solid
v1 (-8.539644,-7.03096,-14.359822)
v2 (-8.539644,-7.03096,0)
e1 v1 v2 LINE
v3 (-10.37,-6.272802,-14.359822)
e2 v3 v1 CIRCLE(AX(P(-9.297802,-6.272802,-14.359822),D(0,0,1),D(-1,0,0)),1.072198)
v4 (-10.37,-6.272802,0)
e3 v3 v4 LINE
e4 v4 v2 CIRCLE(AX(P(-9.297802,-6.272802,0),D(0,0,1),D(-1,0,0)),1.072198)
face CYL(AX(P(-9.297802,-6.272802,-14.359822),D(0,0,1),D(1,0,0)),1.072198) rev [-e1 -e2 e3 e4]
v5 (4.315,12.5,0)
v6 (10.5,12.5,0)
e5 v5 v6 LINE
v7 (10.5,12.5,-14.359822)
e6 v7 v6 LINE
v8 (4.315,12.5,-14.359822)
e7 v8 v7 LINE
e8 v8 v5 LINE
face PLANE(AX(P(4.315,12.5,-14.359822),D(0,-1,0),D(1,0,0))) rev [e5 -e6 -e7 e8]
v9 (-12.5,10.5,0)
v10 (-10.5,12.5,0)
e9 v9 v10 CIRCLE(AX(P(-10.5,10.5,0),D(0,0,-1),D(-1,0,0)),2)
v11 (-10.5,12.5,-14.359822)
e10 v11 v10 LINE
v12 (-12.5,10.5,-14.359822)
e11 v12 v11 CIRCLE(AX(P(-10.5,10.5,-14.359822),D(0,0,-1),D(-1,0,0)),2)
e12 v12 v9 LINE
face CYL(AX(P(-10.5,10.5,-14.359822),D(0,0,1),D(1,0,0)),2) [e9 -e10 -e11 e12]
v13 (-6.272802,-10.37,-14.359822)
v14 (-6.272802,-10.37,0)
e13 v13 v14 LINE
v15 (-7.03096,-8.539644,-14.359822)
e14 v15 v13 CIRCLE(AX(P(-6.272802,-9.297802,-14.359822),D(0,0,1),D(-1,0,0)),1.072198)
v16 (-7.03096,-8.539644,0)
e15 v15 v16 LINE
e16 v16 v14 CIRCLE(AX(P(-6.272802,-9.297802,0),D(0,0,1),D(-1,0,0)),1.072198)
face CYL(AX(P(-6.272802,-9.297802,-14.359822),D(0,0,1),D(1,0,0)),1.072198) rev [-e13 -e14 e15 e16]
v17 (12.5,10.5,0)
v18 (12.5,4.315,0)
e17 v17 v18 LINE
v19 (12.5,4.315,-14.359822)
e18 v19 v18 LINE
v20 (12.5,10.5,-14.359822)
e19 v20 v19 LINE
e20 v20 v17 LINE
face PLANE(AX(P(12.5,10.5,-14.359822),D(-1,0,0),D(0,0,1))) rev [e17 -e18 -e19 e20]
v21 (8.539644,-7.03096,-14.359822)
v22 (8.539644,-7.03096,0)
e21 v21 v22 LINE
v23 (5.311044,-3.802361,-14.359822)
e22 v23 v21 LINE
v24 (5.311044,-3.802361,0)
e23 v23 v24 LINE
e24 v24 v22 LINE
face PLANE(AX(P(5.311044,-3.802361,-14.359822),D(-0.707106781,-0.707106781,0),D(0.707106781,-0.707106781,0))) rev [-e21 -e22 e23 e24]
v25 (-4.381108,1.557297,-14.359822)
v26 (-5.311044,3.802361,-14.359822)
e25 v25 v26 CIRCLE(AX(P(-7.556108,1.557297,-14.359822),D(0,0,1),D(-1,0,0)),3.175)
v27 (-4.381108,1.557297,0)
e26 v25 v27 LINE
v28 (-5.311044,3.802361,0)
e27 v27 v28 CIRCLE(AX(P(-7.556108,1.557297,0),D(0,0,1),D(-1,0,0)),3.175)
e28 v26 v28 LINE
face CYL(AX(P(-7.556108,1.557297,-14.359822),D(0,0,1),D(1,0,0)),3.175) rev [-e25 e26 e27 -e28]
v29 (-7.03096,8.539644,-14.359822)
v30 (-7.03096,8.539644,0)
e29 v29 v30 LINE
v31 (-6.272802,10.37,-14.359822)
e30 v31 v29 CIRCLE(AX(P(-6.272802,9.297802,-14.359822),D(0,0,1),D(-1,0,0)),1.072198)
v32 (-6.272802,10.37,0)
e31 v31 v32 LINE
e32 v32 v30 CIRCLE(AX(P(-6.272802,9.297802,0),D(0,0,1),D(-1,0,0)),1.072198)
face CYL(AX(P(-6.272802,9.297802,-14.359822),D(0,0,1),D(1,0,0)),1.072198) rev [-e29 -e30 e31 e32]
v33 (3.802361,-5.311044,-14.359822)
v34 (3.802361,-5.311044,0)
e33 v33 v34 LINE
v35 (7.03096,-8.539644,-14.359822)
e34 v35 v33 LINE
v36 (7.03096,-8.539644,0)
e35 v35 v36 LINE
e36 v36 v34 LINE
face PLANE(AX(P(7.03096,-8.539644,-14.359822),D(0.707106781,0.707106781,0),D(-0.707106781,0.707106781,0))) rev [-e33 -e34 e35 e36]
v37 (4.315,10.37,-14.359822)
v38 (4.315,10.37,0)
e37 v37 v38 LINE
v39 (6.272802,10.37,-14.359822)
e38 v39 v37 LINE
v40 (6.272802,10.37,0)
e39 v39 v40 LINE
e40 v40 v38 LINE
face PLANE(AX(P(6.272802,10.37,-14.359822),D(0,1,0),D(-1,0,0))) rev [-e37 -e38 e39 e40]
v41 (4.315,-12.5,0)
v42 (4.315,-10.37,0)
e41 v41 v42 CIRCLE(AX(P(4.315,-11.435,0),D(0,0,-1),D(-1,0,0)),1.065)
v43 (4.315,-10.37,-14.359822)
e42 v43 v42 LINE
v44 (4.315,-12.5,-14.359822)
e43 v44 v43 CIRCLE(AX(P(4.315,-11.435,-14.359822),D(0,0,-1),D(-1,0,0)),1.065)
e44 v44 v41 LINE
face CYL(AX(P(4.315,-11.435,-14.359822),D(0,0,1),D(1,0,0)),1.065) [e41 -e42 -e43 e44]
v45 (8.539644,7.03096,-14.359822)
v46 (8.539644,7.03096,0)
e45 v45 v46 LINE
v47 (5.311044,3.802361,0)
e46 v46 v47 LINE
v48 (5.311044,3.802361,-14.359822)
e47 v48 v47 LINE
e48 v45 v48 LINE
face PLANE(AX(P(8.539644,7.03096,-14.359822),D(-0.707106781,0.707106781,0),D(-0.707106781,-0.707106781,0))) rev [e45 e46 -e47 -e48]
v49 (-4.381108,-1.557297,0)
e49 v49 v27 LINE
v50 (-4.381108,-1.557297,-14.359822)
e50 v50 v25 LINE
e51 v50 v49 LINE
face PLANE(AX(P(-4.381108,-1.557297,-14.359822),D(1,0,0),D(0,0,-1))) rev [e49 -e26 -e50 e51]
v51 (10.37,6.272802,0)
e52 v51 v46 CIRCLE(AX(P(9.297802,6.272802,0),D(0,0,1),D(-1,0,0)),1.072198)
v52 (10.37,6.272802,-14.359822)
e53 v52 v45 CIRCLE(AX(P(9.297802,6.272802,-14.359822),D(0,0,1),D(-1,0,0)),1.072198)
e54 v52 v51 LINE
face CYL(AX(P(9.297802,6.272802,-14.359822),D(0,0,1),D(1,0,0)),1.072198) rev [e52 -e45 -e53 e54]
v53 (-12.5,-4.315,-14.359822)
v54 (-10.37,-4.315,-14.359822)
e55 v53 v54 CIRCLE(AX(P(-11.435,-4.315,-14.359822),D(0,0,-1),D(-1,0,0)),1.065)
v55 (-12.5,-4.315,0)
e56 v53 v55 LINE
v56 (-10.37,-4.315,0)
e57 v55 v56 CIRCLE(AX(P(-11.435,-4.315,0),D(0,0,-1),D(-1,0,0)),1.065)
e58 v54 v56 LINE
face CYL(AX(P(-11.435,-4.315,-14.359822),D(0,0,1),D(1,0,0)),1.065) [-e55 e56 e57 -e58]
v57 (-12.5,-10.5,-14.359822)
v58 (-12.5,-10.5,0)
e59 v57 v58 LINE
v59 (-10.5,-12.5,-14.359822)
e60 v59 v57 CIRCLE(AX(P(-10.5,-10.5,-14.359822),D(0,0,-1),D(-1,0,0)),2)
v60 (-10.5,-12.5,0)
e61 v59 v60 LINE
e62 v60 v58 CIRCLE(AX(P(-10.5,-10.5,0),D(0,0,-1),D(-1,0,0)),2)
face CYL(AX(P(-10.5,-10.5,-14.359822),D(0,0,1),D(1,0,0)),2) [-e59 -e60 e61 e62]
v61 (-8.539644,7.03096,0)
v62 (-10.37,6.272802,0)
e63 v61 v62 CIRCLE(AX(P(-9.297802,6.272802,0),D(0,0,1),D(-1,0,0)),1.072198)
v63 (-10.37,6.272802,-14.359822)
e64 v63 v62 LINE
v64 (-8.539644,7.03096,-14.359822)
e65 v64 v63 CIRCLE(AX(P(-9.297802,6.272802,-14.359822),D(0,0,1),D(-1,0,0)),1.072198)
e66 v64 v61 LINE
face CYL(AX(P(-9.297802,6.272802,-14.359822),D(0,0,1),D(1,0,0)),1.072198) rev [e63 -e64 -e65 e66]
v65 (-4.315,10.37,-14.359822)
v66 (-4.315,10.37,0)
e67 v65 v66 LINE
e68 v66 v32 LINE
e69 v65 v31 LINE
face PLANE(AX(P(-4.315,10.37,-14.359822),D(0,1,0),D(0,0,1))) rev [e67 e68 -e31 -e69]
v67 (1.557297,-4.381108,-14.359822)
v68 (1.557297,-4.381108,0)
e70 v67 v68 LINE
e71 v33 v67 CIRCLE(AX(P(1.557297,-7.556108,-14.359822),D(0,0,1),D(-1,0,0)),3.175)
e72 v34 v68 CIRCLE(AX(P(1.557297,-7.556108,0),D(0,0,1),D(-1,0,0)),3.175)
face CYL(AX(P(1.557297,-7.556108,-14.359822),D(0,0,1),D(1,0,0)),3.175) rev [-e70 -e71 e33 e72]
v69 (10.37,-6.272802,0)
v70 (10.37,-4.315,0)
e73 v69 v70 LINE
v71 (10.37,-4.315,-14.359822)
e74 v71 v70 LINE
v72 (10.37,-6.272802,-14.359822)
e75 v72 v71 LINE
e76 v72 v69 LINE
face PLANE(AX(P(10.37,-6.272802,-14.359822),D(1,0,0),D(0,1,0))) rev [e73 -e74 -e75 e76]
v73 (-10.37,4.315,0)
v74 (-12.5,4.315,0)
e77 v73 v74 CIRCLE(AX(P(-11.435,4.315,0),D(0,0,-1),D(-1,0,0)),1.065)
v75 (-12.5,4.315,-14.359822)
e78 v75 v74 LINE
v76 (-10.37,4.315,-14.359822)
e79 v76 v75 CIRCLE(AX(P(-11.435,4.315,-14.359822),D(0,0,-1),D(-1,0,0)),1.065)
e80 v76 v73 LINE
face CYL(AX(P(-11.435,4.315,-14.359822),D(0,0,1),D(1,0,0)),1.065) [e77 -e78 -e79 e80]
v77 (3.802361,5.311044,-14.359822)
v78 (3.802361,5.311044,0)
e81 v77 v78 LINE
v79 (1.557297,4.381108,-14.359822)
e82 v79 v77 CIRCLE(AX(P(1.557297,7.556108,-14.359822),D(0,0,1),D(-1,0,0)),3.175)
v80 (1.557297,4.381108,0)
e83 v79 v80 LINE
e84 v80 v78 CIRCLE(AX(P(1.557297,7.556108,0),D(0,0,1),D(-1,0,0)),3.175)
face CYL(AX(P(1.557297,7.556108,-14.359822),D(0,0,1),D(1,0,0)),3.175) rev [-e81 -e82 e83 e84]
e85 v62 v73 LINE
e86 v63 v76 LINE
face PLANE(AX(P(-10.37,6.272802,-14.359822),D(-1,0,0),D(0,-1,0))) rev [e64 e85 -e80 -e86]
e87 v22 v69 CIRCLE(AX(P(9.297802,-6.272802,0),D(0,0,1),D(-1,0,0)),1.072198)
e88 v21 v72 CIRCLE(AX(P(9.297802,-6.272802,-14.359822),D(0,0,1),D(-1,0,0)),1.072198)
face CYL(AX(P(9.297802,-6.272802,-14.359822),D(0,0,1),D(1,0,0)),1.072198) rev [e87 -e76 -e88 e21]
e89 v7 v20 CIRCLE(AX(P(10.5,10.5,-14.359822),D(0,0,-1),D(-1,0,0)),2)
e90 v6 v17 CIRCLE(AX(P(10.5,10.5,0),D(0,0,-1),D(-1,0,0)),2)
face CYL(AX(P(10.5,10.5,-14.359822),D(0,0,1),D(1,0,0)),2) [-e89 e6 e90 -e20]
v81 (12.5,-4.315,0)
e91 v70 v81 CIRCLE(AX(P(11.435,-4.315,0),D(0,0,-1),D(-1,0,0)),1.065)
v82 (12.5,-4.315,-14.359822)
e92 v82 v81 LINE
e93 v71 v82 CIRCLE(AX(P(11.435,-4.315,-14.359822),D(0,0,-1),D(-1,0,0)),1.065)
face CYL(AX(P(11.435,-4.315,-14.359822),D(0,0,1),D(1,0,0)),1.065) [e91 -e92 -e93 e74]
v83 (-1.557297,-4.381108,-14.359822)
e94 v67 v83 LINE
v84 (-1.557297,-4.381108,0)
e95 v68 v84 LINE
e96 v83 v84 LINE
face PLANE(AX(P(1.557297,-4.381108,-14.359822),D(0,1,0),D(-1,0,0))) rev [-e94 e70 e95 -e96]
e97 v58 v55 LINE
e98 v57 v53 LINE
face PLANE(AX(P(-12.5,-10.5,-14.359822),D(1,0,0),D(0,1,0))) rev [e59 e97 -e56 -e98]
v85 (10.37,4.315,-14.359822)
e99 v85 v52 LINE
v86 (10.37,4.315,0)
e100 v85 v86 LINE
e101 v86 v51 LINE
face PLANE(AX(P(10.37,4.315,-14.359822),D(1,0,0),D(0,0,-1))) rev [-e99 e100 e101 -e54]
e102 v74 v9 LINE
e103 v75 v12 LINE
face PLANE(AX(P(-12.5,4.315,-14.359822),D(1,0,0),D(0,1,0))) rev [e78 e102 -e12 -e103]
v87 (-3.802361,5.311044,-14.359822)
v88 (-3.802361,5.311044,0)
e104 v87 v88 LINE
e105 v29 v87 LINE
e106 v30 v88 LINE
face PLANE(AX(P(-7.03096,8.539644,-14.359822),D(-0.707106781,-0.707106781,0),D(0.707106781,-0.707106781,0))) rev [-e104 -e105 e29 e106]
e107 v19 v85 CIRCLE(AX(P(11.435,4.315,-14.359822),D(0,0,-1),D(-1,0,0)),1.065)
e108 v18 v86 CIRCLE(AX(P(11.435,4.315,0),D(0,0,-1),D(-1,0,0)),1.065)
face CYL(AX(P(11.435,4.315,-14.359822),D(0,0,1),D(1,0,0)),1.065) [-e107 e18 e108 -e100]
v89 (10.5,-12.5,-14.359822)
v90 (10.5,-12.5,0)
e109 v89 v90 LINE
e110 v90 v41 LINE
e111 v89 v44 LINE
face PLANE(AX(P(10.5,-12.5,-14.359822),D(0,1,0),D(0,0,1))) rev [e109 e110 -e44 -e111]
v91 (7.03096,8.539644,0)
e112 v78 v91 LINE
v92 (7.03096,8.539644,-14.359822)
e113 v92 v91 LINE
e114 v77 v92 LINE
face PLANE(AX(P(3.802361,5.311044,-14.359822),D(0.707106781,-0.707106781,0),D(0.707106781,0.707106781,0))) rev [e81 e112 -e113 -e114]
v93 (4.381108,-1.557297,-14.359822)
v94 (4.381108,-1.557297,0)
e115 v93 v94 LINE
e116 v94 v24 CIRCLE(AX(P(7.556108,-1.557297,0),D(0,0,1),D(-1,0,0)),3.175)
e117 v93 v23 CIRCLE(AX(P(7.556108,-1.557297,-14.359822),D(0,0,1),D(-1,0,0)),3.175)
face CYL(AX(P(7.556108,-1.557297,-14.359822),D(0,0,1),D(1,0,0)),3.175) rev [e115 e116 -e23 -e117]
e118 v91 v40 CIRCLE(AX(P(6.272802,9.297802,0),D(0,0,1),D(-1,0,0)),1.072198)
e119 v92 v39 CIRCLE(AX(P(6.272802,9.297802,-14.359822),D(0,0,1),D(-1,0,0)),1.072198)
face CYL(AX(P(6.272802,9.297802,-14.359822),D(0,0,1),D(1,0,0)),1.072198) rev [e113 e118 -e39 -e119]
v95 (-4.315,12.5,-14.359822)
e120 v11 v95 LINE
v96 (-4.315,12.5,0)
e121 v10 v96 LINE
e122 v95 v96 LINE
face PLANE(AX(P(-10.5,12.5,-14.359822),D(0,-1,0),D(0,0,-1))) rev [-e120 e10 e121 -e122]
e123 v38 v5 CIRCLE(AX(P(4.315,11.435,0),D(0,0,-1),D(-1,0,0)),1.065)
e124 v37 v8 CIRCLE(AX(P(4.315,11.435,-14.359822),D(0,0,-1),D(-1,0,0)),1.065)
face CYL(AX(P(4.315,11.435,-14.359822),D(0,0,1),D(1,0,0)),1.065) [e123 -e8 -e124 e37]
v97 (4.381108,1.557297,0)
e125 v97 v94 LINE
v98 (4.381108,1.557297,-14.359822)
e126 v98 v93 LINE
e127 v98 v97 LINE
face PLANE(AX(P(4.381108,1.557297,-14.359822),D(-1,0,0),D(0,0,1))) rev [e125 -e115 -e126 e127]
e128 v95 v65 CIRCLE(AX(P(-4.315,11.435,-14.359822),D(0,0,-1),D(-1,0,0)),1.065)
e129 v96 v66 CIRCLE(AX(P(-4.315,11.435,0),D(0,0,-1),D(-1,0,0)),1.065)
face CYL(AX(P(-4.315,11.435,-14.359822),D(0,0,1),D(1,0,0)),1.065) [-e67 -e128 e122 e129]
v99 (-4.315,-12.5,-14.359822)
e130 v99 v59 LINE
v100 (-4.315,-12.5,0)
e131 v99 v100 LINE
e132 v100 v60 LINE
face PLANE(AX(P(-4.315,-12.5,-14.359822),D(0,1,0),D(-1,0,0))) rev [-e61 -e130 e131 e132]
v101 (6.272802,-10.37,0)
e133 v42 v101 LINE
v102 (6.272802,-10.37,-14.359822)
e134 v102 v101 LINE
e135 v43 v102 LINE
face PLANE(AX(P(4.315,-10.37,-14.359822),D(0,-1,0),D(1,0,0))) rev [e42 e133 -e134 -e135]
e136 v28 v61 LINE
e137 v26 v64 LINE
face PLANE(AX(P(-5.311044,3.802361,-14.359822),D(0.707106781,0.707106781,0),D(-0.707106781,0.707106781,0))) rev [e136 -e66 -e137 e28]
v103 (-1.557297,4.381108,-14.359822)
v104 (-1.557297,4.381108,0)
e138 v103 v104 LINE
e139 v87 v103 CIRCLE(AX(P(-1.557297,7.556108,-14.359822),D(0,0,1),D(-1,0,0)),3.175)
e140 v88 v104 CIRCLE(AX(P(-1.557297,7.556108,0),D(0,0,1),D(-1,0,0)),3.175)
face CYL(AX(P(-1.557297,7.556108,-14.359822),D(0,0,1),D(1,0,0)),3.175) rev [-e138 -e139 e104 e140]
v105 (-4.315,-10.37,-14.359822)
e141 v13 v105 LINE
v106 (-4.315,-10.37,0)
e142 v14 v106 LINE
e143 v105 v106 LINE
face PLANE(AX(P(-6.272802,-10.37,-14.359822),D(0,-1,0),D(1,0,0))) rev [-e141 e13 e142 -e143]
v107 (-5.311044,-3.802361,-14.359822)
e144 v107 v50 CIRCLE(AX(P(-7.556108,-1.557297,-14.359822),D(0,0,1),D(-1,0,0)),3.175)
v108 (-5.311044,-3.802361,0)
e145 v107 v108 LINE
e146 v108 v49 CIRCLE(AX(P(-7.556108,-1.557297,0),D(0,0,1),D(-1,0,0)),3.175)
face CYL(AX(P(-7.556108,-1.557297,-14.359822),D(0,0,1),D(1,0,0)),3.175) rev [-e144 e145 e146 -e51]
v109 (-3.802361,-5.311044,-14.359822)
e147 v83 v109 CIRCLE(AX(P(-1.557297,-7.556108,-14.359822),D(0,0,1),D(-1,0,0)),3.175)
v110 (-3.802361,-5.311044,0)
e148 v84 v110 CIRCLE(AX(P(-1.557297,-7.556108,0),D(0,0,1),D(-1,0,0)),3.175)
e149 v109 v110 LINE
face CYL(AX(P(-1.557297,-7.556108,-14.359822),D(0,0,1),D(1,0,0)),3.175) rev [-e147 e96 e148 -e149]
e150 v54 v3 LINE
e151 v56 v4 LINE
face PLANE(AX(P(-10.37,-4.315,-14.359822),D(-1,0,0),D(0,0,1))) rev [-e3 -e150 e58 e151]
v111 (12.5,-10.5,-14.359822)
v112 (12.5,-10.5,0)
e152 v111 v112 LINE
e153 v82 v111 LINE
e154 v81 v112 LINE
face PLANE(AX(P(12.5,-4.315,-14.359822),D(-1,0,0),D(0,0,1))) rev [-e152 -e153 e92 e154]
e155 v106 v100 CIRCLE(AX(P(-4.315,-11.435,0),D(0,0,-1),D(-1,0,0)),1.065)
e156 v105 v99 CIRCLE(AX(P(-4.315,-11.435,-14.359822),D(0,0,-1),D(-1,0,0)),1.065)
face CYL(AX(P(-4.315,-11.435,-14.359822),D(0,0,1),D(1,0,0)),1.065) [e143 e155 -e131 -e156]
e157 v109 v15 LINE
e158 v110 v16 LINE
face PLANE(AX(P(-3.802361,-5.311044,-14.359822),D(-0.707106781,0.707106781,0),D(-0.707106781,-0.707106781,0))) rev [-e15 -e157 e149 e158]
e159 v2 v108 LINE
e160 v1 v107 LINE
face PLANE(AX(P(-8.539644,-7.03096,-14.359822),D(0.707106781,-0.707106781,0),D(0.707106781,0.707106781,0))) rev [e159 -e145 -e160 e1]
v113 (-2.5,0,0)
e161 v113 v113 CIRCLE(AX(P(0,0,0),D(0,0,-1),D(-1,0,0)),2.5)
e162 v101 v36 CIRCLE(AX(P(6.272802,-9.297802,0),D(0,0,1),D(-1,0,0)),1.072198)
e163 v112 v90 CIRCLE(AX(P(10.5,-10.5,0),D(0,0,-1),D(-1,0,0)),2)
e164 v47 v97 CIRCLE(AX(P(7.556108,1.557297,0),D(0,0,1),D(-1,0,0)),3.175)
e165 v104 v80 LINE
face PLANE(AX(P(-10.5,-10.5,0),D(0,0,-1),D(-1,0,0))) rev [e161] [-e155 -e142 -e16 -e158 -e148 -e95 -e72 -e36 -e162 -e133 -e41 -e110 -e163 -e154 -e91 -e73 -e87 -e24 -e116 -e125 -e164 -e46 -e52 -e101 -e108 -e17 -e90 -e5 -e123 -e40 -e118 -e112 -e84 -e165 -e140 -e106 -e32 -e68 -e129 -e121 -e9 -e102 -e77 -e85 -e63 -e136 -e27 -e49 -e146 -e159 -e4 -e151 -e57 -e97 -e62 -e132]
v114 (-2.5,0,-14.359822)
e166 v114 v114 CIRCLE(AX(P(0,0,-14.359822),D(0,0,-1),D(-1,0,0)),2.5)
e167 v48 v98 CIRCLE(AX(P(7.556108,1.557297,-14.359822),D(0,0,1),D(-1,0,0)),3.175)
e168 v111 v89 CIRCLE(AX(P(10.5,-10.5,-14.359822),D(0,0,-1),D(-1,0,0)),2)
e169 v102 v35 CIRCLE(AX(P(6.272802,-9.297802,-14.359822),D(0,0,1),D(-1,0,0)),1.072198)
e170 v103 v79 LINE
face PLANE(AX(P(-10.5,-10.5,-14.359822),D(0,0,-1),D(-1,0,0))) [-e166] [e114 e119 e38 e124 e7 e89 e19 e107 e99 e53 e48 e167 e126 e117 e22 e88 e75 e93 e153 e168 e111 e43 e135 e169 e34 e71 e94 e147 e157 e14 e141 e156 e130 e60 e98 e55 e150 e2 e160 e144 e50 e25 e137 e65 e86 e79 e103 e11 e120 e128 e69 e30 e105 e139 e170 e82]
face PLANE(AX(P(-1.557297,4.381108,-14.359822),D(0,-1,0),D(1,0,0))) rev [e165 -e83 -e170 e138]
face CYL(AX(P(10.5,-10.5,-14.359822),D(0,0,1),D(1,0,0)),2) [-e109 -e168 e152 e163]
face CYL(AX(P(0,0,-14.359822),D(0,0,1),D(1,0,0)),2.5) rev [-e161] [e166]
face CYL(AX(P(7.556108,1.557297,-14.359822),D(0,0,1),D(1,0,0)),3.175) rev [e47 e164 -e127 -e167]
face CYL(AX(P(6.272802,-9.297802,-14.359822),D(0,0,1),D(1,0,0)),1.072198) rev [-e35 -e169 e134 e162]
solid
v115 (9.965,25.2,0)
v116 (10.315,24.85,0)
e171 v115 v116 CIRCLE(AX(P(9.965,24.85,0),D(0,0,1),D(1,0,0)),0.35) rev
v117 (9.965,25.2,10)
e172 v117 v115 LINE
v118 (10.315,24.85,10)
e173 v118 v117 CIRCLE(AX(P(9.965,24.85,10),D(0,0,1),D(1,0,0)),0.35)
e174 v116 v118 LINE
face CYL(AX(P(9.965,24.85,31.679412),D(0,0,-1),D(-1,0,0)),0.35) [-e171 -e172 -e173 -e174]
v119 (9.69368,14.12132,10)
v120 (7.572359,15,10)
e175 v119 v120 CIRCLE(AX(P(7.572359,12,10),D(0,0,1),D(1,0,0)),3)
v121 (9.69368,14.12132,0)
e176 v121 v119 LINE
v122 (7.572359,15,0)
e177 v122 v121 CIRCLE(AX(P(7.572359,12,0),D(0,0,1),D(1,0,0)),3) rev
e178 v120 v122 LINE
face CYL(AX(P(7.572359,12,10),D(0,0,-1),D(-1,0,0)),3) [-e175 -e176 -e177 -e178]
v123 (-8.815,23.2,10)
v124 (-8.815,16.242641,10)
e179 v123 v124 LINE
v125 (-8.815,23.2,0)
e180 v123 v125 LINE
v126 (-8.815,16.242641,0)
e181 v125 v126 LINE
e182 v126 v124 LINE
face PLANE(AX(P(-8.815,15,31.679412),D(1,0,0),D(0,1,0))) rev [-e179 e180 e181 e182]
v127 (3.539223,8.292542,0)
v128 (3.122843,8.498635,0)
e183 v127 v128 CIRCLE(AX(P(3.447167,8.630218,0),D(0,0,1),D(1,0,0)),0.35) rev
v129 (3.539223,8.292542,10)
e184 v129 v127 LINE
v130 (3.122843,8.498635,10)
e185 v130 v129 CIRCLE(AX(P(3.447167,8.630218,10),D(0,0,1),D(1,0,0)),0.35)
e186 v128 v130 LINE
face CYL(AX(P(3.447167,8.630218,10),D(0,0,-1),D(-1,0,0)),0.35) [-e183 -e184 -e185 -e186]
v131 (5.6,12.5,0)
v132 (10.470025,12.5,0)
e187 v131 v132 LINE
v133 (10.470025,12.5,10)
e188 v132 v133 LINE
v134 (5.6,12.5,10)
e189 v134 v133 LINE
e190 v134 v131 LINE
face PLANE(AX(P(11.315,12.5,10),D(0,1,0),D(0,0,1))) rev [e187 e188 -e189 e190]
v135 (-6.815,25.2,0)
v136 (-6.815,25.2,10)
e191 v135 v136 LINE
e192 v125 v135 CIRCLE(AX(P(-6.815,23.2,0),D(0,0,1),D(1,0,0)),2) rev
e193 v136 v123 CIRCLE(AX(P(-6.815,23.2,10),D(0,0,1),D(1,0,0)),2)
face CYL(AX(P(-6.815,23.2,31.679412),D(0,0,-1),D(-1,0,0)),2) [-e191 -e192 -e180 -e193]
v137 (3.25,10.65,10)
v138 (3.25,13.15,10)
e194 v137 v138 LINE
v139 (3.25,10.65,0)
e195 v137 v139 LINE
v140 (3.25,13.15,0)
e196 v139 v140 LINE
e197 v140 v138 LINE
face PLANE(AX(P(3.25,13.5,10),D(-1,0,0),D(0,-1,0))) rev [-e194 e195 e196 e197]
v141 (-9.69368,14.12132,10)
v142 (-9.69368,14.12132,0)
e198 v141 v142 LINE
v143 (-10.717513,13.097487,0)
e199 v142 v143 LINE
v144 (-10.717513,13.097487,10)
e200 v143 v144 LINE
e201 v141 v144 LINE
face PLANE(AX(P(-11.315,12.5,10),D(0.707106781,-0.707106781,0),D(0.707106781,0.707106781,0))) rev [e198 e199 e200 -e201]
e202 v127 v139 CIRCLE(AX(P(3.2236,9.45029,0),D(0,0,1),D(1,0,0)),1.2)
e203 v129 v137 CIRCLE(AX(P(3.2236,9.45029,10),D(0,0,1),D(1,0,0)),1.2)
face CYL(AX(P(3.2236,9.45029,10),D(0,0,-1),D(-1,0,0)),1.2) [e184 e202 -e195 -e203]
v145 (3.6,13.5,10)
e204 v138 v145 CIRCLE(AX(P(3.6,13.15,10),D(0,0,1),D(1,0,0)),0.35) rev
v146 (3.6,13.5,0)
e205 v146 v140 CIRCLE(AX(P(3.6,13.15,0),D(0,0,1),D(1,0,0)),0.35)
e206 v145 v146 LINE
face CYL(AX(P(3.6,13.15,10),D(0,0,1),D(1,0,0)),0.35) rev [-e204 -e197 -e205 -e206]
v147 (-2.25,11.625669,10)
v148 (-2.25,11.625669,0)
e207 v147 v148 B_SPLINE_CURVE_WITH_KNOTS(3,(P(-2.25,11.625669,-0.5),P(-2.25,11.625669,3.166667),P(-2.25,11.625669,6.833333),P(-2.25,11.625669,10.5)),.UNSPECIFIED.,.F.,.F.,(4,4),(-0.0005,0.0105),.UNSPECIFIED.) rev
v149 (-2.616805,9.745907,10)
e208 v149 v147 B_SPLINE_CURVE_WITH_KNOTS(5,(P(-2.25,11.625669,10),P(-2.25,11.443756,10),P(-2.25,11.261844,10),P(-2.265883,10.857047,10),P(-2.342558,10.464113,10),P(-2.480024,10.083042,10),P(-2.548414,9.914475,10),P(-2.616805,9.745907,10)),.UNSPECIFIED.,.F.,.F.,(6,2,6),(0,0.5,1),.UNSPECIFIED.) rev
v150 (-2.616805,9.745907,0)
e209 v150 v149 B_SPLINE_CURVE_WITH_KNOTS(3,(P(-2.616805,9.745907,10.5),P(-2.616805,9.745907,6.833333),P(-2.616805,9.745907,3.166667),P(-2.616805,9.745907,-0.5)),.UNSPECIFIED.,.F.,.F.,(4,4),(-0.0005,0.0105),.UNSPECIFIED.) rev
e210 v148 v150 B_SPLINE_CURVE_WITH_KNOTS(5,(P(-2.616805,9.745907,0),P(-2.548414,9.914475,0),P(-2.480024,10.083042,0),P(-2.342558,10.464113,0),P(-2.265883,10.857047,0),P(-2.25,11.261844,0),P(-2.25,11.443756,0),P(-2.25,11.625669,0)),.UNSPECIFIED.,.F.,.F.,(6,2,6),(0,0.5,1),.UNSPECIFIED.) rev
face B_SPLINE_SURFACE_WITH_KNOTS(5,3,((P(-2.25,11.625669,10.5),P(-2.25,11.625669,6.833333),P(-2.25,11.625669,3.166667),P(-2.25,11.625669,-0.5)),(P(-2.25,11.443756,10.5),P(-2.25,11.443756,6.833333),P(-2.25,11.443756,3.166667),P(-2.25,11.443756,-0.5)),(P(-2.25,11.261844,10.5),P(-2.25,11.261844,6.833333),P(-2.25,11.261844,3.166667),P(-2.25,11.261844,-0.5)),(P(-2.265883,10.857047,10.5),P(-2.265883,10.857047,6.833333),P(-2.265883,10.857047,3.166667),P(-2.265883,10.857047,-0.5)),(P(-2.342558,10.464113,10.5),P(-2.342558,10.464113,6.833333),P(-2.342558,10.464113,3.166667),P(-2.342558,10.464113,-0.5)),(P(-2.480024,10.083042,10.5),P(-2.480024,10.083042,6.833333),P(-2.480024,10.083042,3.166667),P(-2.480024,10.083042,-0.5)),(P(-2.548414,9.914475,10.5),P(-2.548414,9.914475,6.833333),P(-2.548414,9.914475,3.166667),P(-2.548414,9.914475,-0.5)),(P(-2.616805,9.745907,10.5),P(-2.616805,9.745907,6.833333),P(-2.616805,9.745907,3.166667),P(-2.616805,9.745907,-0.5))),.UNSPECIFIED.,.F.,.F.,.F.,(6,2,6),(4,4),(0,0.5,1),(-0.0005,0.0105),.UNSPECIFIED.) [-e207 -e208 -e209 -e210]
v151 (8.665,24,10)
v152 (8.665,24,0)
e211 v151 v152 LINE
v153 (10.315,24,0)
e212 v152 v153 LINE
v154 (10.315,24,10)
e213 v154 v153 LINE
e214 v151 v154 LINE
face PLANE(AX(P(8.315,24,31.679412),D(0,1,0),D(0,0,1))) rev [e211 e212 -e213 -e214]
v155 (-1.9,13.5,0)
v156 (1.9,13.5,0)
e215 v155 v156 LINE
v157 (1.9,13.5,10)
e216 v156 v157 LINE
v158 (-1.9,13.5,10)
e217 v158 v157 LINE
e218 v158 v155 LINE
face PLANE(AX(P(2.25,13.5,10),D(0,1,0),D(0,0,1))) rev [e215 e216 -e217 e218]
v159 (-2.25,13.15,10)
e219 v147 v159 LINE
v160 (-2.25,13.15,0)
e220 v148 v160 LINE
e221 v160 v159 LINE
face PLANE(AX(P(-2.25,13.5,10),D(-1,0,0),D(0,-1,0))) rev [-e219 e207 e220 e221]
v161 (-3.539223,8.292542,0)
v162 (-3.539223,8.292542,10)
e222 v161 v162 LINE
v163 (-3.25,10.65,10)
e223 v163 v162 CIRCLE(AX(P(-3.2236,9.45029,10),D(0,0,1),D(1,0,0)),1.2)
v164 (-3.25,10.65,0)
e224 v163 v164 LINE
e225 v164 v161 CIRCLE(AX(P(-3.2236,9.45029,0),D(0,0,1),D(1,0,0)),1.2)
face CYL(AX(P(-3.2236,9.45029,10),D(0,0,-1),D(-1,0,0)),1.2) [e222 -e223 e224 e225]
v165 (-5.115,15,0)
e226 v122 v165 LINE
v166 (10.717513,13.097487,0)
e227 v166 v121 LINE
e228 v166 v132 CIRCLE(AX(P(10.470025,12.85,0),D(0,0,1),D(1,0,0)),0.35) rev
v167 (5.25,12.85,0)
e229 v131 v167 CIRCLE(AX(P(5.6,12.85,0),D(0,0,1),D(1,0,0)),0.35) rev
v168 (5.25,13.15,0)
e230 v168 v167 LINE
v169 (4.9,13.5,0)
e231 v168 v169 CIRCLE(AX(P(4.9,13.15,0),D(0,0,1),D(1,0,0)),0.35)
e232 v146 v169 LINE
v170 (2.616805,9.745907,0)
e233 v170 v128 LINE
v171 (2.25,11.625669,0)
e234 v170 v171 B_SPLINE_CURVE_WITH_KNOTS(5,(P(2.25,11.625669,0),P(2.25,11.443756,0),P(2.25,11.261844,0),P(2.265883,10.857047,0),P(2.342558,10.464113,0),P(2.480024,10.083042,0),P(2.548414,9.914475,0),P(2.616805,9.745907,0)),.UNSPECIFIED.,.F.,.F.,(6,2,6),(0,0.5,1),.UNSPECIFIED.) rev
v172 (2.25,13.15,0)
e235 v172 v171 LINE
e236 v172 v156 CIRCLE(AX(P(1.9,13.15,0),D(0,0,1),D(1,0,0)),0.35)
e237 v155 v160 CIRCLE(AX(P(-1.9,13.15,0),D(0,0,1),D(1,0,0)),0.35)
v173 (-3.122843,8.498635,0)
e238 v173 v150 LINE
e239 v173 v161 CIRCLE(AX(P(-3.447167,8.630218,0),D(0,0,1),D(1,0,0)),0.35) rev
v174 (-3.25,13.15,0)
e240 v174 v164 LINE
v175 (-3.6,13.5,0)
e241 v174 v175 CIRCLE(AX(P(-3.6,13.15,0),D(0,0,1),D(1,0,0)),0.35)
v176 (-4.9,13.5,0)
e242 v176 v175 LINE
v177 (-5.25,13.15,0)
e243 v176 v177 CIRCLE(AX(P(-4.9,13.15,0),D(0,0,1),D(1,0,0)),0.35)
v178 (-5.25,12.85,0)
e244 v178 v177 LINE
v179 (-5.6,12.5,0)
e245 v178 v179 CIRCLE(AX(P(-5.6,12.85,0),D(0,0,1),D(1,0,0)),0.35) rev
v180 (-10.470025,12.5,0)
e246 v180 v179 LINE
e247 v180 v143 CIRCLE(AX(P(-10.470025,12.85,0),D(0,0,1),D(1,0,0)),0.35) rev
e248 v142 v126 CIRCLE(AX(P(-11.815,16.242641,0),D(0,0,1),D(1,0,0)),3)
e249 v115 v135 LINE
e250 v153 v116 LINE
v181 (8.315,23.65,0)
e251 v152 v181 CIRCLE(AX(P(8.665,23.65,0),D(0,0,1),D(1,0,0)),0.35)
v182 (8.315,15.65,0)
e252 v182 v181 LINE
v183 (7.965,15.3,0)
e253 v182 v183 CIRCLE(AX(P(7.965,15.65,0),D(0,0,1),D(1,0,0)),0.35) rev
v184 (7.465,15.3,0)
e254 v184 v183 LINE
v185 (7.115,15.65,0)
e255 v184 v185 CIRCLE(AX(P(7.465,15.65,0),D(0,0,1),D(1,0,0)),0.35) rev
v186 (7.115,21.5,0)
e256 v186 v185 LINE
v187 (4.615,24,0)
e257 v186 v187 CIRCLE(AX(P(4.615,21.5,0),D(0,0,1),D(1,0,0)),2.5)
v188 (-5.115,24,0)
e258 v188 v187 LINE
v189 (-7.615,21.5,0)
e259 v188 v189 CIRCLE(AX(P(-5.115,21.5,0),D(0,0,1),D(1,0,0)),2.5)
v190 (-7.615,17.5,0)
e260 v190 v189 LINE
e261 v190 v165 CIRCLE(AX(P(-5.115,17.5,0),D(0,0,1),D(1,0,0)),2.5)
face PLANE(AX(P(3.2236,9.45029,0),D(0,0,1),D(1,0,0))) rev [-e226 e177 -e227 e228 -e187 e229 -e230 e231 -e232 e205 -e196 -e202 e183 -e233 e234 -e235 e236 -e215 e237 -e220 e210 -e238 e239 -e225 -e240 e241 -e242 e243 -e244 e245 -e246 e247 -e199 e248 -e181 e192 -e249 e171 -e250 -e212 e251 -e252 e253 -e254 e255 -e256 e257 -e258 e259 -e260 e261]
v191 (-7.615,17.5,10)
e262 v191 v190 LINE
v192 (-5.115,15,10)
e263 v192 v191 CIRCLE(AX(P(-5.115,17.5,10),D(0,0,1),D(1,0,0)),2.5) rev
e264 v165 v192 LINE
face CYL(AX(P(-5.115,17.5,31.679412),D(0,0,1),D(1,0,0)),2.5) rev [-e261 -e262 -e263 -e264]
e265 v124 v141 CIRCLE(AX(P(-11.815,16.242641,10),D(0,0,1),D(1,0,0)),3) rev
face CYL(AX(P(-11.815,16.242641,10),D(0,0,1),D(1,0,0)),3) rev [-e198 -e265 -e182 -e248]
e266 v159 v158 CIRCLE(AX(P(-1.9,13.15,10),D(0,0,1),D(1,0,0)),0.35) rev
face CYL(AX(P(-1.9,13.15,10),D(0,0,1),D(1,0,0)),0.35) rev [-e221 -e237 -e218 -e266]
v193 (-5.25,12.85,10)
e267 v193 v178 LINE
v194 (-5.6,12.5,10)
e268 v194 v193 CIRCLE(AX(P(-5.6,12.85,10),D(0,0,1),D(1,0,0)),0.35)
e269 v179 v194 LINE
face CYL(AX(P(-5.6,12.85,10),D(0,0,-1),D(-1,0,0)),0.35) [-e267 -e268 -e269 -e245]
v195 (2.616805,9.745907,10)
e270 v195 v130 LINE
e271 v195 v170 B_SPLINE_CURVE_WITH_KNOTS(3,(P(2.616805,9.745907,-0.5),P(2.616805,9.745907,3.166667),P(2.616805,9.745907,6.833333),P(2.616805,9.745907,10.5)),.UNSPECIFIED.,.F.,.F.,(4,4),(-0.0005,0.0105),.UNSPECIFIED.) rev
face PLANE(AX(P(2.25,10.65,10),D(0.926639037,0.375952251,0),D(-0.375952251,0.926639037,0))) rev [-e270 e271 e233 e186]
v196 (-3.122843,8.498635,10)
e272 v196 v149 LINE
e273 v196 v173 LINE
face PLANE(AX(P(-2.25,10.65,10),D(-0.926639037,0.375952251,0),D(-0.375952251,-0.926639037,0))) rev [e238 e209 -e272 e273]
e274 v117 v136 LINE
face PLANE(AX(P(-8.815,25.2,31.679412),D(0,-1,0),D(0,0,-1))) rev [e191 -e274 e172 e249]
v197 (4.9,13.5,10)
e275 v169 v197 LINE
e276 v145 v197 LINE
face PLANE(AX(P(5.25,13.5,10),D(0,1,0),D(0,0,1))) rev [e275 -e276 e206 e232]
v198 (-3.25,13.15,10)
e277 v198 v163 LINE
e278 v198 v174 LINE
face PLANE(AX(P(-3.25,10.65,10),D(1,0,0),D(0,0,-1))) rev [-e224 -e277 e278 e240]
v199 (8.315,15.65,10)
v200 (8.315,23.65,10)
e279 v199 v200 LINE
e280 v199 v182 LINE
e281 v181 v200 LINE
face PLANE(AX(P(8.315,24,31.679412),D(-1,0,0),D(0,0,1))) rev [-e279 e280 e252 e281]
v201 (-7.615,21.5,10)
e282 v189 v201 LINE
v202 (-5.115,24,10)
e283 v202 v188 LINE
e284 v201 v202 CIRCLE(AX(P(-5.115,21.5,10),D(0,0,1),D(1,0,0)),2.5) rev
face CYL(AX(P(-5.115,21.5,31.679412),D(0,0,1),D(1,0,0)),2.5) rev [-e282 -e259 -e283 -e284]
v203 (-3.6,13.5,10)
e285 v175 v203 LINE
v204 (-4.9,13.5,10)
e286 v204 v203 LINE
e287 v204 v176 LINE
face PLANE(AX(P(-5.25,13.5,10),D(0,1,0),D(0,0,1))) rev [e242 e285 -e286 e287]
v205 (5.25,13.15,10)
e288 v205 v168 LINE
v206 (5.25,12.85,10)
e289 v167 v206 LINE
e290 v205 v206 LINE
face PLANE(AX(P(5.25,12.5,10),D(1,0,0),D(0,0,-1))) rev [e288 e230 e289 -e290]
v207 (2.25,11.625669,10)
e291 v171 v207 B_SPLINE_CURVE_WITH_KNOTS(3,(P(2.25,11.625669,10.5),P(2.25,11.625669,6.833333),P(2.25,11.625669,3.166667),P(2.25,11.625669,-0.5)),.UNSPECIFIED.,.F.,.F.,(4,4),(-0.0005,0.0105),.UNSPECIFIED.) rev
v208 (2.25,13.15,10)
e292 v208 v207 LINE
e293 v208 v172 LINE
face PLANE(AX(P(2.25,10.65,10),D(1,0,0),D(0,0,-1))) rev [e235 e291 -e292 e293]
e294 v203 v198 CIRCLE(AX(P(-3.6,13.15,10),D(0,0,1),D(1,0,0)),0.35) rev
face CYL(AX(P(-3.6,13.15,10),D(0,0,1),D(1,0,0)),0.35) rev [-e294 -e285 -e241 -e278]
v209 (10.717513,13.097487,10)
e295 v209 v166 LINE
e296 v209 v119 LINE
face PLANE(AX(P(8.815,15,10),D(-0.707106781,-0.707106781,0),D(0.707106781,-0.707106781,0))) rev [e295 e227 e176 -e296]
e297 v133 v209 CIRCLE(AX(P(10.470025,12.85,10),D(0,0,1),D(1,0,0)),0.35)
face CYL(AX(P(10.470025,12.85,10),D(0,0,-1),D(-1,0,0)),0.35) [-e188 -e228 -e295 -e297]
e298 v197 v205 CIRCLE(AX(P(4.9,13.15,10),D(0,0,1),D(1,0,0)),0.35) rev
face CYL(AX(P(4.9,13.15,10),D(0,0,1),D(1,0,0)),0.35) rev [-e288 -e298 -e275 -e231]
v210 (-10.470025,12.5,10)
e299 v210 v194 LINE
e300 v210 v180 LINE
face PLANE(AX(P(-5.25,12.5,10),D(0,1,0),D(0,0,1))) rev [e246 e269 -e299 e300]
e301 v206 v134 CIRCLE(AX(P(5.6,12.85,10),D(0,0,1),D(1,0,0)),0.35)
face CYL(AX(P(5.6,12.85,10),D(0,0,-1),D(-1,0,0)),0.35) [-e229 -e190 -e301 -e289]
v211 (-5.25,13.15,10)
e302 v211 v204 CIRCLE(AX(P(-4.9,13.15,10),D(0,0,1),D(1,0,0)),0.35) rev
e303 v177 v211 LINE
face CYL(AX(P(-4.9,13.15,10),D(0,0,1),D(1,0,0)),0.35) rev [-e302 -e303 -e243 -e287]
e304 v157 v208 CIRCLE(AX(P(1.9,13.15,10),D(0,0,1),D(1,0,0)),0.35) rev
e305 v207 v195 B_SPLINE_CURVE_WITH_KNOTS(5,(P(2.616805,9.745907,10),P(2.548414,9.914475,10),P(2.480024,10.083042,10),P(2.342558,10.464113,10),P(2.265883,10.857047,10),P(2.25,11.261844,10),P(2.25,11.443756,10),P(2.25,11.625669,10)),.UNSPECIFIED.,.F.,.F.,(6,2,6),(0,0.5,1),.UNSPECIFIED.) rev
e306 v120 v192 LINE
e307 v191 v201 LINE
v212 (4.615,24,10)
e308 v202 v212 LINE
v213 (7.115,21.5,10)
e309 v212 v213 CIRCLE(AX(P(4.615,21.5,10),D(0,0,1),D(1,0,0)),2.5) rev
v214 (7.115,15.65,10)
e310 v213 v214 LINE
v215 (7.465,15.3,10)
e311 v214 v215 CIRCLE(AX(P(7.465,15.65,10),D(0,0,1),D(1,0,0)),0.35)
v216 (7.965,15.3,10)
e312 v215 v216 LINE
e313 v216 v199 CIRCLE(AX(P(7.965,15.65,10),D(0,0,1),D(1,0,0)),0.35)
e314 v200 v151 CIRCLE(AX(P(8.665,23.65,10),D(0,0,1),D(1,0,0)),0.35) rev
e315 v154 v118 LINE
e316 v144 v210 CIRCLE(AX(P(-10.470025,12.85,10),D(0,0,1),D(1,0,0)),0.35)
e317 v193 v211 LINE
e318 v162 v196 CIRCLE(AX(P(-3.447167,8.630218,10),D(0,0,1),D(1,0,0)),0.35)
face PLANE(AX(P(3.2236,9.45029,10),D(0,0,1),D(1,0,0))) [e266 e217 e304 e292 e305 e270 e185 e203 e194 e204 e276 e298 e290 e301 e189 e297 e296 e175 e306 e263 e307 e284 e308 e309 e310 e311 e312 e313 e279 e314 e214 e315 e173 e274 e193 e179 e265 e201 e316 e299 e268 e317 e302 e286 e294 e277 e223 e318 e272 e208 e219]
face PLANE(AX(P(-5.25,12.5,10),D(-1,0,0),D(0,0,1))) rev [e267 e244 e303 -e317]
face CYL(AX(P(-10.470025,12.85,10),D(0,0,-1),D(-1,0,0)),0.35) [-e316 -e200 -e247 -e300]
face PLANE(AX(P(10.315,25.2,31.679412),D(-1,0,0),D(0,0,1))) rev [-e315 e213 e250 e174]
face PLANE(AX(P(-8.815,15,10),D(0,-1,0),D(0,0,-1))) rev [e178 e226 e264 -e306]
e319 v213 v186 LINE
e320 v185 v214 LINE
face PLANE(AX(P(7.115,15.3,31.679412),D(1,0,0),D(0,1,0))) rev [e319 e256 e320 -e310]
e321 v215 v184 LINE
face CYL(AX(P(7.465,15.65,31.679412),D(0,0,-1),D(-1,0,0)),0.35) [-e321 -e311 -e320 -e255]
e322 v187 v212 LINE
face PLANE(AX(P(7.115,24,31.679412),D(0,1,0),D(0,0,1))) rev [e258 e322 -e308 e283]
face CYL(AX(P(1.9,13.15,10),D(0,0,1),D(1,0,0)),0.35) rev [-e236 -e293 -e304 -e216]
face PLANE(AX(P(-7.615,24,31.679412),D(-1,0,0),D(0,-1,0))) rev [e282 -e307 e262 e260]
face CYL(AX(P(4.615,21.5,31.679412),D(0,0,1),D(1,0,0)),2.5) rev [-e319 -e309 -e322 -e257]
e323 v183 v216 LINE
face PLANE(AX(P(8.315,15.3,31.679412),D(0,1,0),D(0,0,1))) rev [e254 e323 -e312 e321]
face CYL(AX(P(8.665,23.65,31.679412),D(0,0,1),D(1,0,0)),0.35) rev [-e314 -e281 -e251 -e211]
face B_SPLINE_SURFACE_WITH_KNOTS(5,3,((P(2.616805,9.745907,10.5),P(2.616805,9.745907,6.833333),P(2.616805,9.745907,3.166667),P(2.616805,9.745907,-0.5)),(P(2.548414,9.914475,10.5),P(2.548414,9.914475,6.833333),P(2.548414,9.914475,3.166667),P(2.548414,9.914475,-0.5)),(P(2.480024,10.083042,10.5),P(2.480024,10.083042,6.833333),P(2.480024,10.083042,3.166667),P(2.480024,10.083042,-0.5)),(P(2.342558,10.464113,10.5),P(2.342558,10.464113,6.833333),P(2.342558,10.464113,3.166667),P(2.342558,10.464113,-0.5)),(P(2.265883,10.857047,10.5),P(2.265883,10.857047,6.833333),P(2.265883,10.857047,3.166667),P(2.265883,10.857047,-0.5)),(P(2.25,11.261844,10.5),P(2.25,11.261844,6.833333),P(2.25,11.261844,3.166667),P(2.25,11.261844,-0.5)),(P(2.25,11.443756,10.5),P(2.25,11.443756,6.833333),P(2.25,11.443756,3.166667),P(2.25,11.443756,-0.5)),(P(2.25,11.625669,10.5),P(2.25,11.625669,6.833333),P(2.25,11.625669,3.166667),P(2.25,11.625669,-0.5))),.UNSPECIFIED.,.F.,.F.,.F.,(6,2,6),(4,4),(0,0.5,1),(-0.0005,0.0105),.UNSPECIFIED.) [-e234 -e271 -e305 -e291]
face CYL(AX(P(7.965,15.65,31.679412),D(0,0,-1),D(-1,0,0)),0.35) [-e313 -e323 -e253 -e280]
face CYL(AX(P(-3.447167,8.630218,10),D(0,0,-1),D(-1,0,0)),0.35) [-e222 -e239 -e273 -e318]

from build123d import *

# Parameters (mm, degrees)
SKETCH11_R                             = 2.5
F_25_SERIES_EXTRUSIONS_25_2525_1_DEPTH = 14.359821885
BOSS_EXTRUDE1_DEPTH                    = 10
BOSS_EXTRUDE3_DEPTH                    = 10
FILLET_R0_35_R                         = 0.35
FILLET2_R                              = 2.5
FILLET_R3_0_R                          = 3
FILLET4_R                              = 2


with BuildPart() as part:
    # Sketch11 → 25 series extrusions 25-2525(1) (new body)
    with BuildSketch(Plane(origin=(0, 0, 0), x_dir=(-1, 0, 0), z_dir=(0, 0, -1))):
        with BuildLine():
            Line((12.5, -10.5), (12.5, -4.315))
            ThreePointArc((12.5, -4.315), (11.435, -3.25), (10.37, -4.315))
            Line((10.37, -4.315), (10.37, -6.272801987))
            ThreePointArc((10.37, -6.272801987), (9.708114403, -7.263383786), (8.539643501, -7.030960473))
            Line((8.539643501, -7.030960473), (5.311043881, -3.802360852))
            ThreePointArc((5.311043881, -3.802360852), (4.622790395, -2.77231672), (4.381107911, -1.557296822))
            Line((4.381107911, -1.557296822), (4.381107911, 1.557296822))
            ThreePointArc((4.381107911, 1.557296822), (4.622790395, 2.77231672), (5.311043881, 3.802360852))
            Line((5.311043881, 3.802360852), (8.539643501, 7.030960473))
            ThreePointArc((8.539643501, 7.030960473), (9.708114403, 7.263383786), (10.37, 6.272801987))
            Line((10.37, 6.272801987), (10.37, 4.315))
            ThreePointArc((10.37, 4.315), (11.435, 3.25), (12.5, 4.315))
            Line((12.5, 4.315), (12.5, 10.5))
            ThreePointArc((12.5, 10.5), (11.914213562, 11.914213562), (10.5, 12.5))
            Line((10.5, 12.5), (4.315, 12.5))
            ThreePointArc((4.315, 12.5), (3.25, 11.435), (4.315, 10.37))
            Line((4.315, 10.37), (6.272801987, 10.37))
            ThreePointArc((6.272801987, 10.37), (7.263383786, 9.708114403), (7.030960473, 8.539643501))
            Line((7.030960473, 8.539643501), (3.802360852, 5.311043881))
            ThreePointArc((3.802360852, 5.311043881), (2.77231672, 4.622790395), (1.557296822, 4.381107911))
            Line((1.557296822, 4.381107911), (-1.557296822, 4.381107911))
            ThreePointArc((-1.557296822, 4.381107911), (-2.77231672, 4.622790395), (-3.802360852, 5.311043881))
            Line((-3.802360852, 5.311043881), (-7.030960473, 8.539643501))
            ThreePointArc((-7.030960473, 8.539643501), (-7.263383786, 9.708114403), (-6.272801987, 10.37))
            Line((-6.272801987, 10.37), (-4.315, 10.37))
            ThreePointArc((-4.315, 10.37), (-3.25, 11.435), (-4.315, 12.5))
            Line((-4.315, 12.5), (-10.5, 12.5))
            ThreePointArc((-10.5, 12.5), (-11.914213562, 11.914213562), (-12.5, 10.5))
            Line((-12.5, 10.5), (-12.5, 4.315))
            ThreePointArc((-12.5, 4.315), (-11.435, 3.25), (-10.37, 4.315))
            Line((-10.37, 4.315), (-10.37, 6.272801987))
            ThreePointArc((-10.37, 6.272801987), (-9.708114403, 7.263383786), (-8.539643501, 7.030960473))
            Line((-8.539643501, 7.030960473), (-5.311043881, 3.802360852))
            ThreePointArc((-5.311043881, 3.802360852), (-4.622790395, 2.77231672), (-4.381107911, 1.557296822))
            Line((-4.381107911, 1.557296822), (-4.381107911, -1.557296822))
            ThreePointArc((-4.381107911, -1.557296822), (-4.622790395, -2.77231672), (-5.311043881, -3.802360852))
            Line((-5.311043881, -3.802360852), (-8.539643501, -7.030960473))
            ThreePointArc((-8.539643501, -7.030960473), (-9.708114403, -7.263383786), (-10.37, -6.272801987))
            Line((-10.37, -6.272801987), (-10.37, -4.315))
            ThreePointArc((-10.37, -4.315), (-11.435, -3.25), (-12.5, -4.315))
            Line((-12.5, -4.315), (-12.5, -10.5))
            ThreePointArc((-12.5, -10.5), (-11.914213562, -11.914213562), (-10.5, -12.5))
            Line((-10.5, -12.5), (-4.315, -12.5))
            ThreePointArc((-4.315, -12.5), (-3.25, -11.435), (-4.315, -10.37))
            Line((-4.315, -10.37), (-6.272801987, -10.37))
            ThreePointArc((-6.272801987, -10.37), (-7.263383786, -9.708114403), (-7.030960473, -8.539643501))
            Line((-7.030960473, -8.539643501), (-3.802360852, -5.311043881))
            ThreePointArc((-3.802360852, -5.311043881), (-2.77231672, -4.622790395), (-1.557296822, -4.381107911))
            Line((-1.557296822, -4.381107911), (1.557296822, -4.381107911))
            ThreePointArc((1.557296822, -4.381107911), (2.77231672, -4.622790395), (3.802360852, -5.311043881))
            Line((3.802360852, -5.311043881), (7.030960473, -8.539643501))
            ThreePointArc((7.030960473, -8.539643501), (7.263383786, -9.708114403), (6.272801987, -10.37))
            Line((6.272801987, -10.37), (4.315, -10.37))
            ThreePointArc((4.315, -10.37), (3.25, -11.435), (4.315, -12.5))
            Line((4.315, -12.5), (10.5, -12.5))
            ThreePointArc((10.5, -12.5), (11.914213562, -11.914213562), (12.5, -10.5))
        make_face()
        Circle(SKETCH11_R, mode=Mode.SUBTRACT)
    extrude(amount=F_25_SERIES_EXTRUSIONS_25_2525_1_DEPTH)


with BuildPart() as body_2:
    # Sketch14 → Boss-Extrude1 (new body)
    with BuildSketch(Plane.XY):
        with BuildLine():
            Line((-11.315, 12.5), (-8.815, 15))
            Line((-8.815, 15), (8.815, 15))
            Line((8.815, 15), (11.315, 12.5))
            Line((11.315, 12.5), (5.25, 12.5))
            Line((5.25, 12.5), (5.25, 13.5))
            Line((5.25, 13.5), (3.25, 13.5))
            Line((3.25, 13.5), (3.25, 10.65))
            ThreePointArc((3.25, 10.65), (4.423527877, 9.437089868), (3.223600485, 8.250290424))
            Line((3.223600485, 8.250290424), (2.25, 10.65))
            Line((2.25, 10.65), (2.25, 13.5))
            Line((2.25, 13.5), (-2.25, 13.5))
            Line((-2.25, 13.5), (-2.25, 10.65))
            Line((-2.25, 10.65), (-3.223600485, 8.250290424))
            ThreePointArc((-3.223600485, 8.250290424), (-4.423527877, 9.437089868), (-3.25, 10.65))
            Line((-3.25, 10.65), (-3.25, 13.5))
            Line((-3.25, 13.5), (-5.25, 13.5))
            Line((-5.25, 13.5), (-5.25, 12.5))
            Line((-5.25, 12.5), (-11.315, 12.5))
        make_face()
    extrude(amount=BOSS_EXTRUDE1_DEPTH)

    # Sketch15 → Boss-Extrude3 (add)
    with BuildSketch(Plane.XY):
        Polygon((-8.815, 15), (-8.815, 25.2), (10.315, 25.2), (10.315, 24), (8.315, 24), (8.315, 15.3), (7.115, 15.3), (7.115, 24), (-7.615, 24), (-7.615, 15), align=None)
    extrude(amount=BOSS_EXTRUDE3_DEPTH)

    # r0.35
    fillet_r0_35_edges = [body_2.edges().sort_by_distance(p)[0] for p in [
        (-11.315, 12.5, 5),
        (11.315, 12.5, 5),
        (5.25, 12.5, 5),
        (5.25, 13.5, 5),
        (3.25, 13.5, 5),
        (3.223600485, 8.250290424, 5),
        (2.25, 13.5, 5),
        (-2.25, 13.5, 5),
        (-3.223600485, 8.250290424, 5),
        (-3.25, 13.5, 5),
        (-5.25, 13.5, 5),
        (-5.25, 12.5, 5),
        (7.115, 15.3, 5),
        (8.315, 15.3, 5),
        (8.315, 24, 5),
        (10.315, 25.2, 5),
    ]]
    fillet(fillet_r0_35_edges, radius=FILLET_R0_35_R)

    # r5.0
    # a fillet whose section is not a circle: 5 mm, written as the material it takes off along each edge
    with BuildSketch(Plane(origin=(2.25, 10.65, -2.439171554), x_dir=(0, 1, 0), z_dir=(0, 0, 1)), Plane(origin=(-2.25, 10.65, -2.439171554), x_dir=(-0.3759522508024761, -0.9266390371210097, 0), z_dir=(0, 0, 1))) as fillet_r5_0_piece_1:
        with BuildLine():
            add(Edge.make_bspline([(0.975668622, 0), (0.793756187, 0), (0.611843752, 0), (0.20704727, -0.015883221), (-0.18588675, -0.0925579), (-0.566958306, -0.230024036), (-0.735525469, -0.298414425), (-0.904092632, -0.366804814)], knots=[0, 0, 0, 0, 0, 0, 0.5, 0.5, 1, 1, 1, 1, 1, 1], degree=5))
            Line((-0.904092632, -0.366804814), (0, 0))
            Line((0, 0), (0.975668622, 0))
        make_face()
    extrude(amount=14.878343109, mode=Mode.SUBTRACT)

    # Fillet2
    fillet2_edges = [body_2.edges().sort_by_distance(p)[0] for p in [
        (-7.615, 15, 5),
        (-7.615, 24, 5),
        (7.115, 24, 5),
    ]]
    fillet(fillet2_edges, radius=FILLET2_R)

    # r3.0
    fillet_r3_0_edges = [body_2.edges().sort_by_distance(p)[0] for p in [
        (-8.815, 15, 5),
        (8.815, 15, 5),
    ]]
    fillet(fillet_r3_0_edges, radius=FILLET_R3_0_R)

    # Fillet4
    fillet4_edges = [body_2.edges().sort_by_distance(p)[0] for p in [
        (-8.815, 25.2, 5),
    ]]
    fillet(fillet4_edges, radius=FILLET4_R)


solid = Compound([part.part, body_2.part])
